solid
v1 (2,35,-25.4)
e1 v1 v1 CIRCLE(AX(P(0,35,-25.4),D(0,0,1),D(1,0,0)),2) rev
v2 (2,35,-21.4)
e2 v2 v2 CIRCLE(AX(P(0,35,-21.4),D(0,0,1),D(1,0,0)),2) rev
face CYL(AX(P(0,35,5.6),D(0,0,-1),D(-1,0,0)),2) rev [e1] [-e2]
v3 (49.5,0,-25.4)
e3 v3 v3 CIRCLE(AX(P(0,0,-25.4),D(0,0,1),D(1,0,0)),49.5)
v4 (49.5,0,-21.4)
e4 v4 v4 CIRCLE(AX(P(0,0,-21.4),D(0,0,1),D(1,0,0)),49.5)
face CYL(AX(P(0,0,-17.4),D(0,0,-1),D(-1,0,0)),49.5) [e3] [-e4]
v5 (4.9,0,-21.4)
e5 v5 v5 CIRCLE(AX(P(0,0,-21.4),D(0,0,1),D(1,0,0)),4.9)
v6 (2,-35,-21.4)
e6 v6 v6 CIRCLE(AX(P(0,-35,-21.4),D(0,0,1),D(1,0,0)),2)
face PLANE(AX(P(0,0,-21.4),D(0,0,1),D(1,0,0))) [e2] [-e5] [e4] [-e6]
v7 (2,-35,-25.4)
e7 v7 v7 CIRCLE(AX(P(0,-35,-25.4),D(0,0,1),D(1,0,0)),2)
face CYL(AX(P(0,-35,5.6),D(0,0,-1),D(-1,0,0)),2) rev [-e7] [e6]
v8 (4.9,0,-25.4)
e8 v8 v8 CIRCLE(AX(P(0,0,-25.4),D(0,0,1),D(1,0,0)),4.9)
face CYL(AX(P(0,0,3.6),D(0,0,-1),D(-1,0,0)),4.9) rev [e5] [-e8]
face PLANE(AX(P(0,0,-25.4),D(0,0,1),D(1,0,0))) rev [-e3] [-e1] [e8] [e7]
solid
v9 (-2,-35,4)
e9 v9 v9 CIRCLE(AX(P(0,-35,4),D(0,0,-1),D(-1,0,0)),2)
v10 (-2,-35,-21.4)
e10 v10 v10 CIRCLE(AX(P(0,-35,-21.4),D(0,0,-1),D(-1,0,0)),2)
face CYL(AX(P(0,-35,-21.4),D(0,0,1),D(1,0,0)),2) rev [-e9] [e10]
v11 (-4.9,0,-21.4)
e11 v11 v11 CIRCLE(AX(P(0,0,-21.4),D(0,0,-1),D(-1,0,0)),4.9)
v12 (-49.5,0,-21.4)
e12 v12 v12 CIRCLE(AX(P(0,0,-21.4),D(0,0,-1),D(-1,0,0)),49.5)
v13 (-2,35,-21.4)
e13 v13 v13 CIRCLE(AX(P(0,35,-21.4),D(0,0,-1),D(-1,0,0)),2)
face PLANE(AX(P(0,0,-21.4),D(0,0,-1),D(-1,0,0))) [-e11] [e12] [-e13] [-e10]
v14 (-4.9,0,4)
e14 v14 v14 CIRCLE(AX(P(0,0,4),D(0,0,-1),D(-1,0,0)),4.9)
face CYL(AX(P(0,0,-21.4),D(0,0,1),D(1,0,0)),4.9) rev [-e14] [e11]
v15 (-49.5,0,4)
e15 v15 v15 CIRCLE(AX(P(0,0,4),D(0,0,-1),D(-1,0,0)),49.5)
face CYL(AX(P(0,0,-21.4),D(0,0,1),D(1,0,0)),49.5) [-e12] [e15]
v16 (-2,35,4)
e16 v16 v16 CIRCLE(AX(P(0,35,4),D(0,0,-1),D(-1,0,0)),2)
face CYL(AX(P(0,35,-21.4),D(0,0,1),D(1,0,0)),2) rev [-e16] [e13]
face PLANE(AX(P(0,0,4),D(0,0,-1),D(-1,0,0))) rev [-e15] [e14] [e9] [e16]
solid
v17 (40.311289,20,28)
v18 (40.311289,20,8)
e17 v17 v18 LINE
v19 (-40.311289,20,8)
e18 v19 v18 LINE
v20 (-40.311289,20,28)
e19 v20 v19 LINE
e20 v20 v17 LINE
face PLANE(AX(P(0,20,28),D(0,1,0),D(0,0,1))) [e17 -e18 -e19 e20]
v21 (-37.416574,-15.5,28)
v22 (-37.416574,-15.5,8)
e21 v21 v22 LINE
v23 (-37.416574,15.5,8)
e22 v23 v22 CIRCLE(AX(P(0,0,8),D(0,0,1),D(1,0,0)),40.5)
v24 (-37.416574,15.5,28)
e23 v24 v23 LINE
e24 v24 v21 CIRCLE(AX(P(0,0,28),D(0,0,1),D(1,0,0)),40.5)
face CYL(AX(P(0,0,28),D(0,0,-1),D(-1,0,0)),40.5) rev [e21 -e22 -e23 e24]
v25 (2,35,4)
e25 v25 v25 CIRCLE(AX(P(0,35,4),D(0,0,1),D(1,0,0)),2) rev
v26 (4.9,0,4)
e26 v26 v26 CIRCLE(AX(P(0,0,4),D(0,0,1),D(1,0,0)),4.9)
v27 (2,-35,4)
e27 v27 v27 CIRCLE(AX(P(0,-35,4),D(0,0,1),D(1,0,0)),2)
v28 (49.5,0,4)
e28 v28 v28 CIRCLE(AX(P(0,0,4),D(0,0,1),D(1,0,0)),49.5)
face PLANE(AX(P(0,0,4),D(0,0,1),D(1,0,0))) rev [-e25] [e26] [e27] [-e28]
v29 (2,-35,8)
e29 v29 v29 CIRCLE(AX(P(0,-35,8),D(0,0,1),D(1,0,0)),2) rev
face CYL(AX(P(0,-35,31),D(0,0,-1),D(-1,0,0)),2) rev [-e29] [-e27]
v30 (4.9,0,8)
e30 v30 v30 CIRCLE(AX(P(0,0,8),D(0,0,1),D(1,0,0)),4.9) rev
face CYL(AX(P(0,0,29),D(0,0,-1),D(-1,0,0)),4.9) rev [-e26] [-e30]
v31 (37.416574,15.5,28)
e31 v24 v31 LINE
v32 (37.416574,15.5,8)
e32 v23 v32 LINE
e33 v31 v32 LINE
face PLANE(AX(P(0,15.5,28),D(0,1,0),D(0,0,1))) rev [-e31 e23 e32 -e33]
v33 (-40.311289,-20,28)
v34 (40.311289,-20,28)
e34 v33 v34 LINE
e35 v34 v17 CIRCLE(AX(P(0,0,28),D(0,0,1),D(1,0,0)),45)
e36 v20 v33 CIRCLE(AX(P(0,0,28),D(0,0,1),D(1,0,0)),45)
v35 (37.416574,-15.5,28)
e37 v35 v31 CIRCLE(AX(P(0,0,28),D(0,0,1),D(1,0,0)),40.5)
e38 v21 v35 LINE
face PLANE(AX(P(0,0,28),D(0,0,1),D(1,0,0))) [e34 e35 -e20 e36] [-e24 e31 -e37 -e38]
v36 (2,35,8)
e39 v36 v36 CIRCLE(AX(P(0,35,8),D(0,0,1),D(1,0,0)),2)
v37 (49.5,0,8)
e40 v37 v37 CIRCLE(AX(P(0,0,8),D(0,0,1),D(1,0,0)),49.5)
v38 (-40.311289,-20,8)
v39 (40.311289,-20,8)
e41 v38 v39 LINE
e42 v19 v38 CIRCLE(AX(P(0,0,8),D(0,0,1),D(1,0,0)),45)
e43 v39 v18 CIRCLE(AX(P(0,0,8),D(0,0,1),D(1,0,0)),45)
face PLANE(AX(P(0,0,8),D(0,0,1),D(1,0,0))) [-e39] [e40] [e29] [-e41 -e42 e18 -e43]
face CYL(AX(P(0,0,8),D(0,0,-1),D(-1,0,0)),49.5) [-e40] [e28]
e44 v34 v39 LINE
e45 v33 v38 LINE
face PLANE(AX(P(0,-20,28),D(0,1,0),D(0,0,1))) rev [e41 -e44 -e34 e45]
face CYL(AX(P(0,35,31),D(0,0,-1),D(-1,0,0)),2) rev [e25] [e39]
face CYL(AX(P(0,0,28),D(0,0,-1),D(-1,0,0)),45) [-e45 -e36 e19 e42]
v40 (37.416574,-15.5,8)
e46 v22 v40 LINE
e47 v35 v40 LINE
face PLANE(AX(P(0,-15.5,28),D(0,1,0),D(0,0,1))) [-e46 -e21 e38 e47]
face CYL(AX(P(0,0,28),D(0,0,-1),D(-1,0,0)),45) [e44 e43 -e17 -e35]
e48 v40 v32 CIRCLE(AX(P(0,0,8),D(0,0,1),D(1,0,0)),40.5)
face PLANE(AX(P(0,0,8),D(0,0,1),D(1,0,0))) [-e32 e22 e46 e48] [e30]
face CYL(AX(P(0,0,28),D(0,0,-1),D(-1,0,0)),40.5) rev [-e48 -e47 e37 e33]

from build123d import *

# Parameters (mm, degrees)
SKETCH2_R           = 49.5
BOSS_EXTRUDE1_DEPTH = 8
SKETCH1_R           = 4.9
CUT_EXTRUDE1_DEPTH  = 29
BOSS_EXTRUDE2_DEPTH = 20
SKETCH1_14_R        = 2
CUT_EXTRUDE5_DEPTH  = 31
SKETCH6_R           = 49.5
SKETCH6_R_2         = 4.9
SKETCH6_R_3         = 2
BOSS_EXTRUDE3_DEPTH = 25.4


# Read off the part's stored shape, not the designer's step: Intersect1
with BuildPart() as part:
    # Sketch2 → Boss-Extrude1 (new body)
    with BuildSketch(Plane.XY):
        Circle(SKETCH2_R)
    extrude(amount=BOSS_EXTRUDE1_DEPTH)

    # Sketch1 → Cut-Extrude1 (cut)
    with BuildSketch(Plane(origin=(0, 0, 0), x_dir=(-1, 0, 0), z_dir=(0, 0, 1))):
        with Locations(Location((0, 0, 0), (0, 0, 180))):
            Circle(SKETCH1_R)
    extrude(amount=CUT_EXTRUDE1_DEPTH, mode=Mode.SUBTRACT)

    # Sketch4 → Boss-Extrude2 (add)
    with BuildSketch(Plane.XY.offset(8)):
        with BuildLine():
            Line((-37.416573868, 15.5), (0, 15.5))
            Line((0, 15.5), (0, 20))
            Line((0, 20), (-40.311288741, 20))
            ThreePointArc((-40.311288741, 20), (-44.933299804, 2.449197563), (-42.246301613, -15.5))
            Line((-42.246301613, -15.5), (-37.416573868, -15.5))
            ThreePointArc((-37.416573868, -15.5), (-40.5, 0), (-37.416573868, 15.5))
        make_face()
        with BuildLine():
            Line((-40.311288741, -20), (0, -20))
            Line((0, -20), (0, -15.5))
            Line((0, -15.5), (-37.416573868, -15.5))
            Line((-37.416573868, -15.5), (-42.246301613, -15.5))
            ThreePointArc((-42.246301613, -15.5), (-41.340070528, -17.776348576), (-40.311288741, -20))
        make_face()
        with BuildLine():
            Line((0, -15.5), (0, -20))
            Line((0, -20), (40.311288741, -20))
            ThreePointArc((40.311288741, -20), (41.340070528, -17.776348576), (42.246301613, -15.5))
            Line((42.246301613, -15.5), (37.416573868, -15.5))
            Line((37.416573868, -15.5), (0, -15.5))
        make_face()
        with BuildLine():
            Line((0, 20), (0, 15.5))
            Line((0, 15.5), (37.416573868, 15.5))
            ThreePointArc((37.416573868, 15.5), (40.5, 0), (37.416573868, -15.5))
            Line((37.416573868, -15.5), (42.246301613, -15.5))
            ThreePointArc((42.246301613, -15.5), (44.933299804, 2.449197563), (40.311288741, 20))
            Line((40.311288741, 20), (0, 20))
        make_face()
    extrude(amount=BOSS_EXTRUDE2_DEPTH)

    # Sketch1<14> → Cut-Extrude5 (cut)
    with BuildSketch(Plane(origin=(0, 0, 0), x_dir=(-1, 0, 0), z_dir=(0, 0, 1))):
        with Locations(Location((0, -35, 0), (0, 0, 180))):
            Circle(SKETCH1_14_R)
        with Locations(Location((0, 35, 0), (0, 0, 180))):
            Circle(SKETCH1_14_R)
    extrude(amount=CUT_EXTRUDE5_DEPTH, mode=Mode.SUBTRACT)


with BuildPart() as body_2:
    # Intersect1: the piece on the far side of the plane
    add(part.part)
    split(bisect_by=Plane.XY.offset(4), keep=Keep.BOTTOM)


with BuildPart() as part_1:
    add(part.part)

    # Intersect1
    split(bisect_by=Plane.XY.offset(4), keep=Keep.TOP)


with BuildPart() as body_2_1:
    # Body-Move/Copy1: moved
    add(body_2.part.moved(Location((0, 0, -25.4))))


with BuildPart() as body_3:
    # Sketch6 → Boss-Extrude3 (new body)
    with BuildSketch(Plane(origin=(0, 0, 4), x_dir=(-1, 0, 0), z_dir=(0, 0, -1))):
        Circle(SKETCH6_R)
        Circle(SKETCH6_R_2, mode=Mode.SUBTRACT)
        with Locations((0, -35)):
            Circle(SKETCH6_R_3, mode=Mode.SUBTRACT)
        with Locations((0, 35)):
            Circle(SKETCH6_R_3, mode=Mode.SUBTRACT)
    extrude(amount=BOSS_EXTRUDE3_DEPTH)


solid = Compound([part_1.part, body_2_1.part, body_3.part])
